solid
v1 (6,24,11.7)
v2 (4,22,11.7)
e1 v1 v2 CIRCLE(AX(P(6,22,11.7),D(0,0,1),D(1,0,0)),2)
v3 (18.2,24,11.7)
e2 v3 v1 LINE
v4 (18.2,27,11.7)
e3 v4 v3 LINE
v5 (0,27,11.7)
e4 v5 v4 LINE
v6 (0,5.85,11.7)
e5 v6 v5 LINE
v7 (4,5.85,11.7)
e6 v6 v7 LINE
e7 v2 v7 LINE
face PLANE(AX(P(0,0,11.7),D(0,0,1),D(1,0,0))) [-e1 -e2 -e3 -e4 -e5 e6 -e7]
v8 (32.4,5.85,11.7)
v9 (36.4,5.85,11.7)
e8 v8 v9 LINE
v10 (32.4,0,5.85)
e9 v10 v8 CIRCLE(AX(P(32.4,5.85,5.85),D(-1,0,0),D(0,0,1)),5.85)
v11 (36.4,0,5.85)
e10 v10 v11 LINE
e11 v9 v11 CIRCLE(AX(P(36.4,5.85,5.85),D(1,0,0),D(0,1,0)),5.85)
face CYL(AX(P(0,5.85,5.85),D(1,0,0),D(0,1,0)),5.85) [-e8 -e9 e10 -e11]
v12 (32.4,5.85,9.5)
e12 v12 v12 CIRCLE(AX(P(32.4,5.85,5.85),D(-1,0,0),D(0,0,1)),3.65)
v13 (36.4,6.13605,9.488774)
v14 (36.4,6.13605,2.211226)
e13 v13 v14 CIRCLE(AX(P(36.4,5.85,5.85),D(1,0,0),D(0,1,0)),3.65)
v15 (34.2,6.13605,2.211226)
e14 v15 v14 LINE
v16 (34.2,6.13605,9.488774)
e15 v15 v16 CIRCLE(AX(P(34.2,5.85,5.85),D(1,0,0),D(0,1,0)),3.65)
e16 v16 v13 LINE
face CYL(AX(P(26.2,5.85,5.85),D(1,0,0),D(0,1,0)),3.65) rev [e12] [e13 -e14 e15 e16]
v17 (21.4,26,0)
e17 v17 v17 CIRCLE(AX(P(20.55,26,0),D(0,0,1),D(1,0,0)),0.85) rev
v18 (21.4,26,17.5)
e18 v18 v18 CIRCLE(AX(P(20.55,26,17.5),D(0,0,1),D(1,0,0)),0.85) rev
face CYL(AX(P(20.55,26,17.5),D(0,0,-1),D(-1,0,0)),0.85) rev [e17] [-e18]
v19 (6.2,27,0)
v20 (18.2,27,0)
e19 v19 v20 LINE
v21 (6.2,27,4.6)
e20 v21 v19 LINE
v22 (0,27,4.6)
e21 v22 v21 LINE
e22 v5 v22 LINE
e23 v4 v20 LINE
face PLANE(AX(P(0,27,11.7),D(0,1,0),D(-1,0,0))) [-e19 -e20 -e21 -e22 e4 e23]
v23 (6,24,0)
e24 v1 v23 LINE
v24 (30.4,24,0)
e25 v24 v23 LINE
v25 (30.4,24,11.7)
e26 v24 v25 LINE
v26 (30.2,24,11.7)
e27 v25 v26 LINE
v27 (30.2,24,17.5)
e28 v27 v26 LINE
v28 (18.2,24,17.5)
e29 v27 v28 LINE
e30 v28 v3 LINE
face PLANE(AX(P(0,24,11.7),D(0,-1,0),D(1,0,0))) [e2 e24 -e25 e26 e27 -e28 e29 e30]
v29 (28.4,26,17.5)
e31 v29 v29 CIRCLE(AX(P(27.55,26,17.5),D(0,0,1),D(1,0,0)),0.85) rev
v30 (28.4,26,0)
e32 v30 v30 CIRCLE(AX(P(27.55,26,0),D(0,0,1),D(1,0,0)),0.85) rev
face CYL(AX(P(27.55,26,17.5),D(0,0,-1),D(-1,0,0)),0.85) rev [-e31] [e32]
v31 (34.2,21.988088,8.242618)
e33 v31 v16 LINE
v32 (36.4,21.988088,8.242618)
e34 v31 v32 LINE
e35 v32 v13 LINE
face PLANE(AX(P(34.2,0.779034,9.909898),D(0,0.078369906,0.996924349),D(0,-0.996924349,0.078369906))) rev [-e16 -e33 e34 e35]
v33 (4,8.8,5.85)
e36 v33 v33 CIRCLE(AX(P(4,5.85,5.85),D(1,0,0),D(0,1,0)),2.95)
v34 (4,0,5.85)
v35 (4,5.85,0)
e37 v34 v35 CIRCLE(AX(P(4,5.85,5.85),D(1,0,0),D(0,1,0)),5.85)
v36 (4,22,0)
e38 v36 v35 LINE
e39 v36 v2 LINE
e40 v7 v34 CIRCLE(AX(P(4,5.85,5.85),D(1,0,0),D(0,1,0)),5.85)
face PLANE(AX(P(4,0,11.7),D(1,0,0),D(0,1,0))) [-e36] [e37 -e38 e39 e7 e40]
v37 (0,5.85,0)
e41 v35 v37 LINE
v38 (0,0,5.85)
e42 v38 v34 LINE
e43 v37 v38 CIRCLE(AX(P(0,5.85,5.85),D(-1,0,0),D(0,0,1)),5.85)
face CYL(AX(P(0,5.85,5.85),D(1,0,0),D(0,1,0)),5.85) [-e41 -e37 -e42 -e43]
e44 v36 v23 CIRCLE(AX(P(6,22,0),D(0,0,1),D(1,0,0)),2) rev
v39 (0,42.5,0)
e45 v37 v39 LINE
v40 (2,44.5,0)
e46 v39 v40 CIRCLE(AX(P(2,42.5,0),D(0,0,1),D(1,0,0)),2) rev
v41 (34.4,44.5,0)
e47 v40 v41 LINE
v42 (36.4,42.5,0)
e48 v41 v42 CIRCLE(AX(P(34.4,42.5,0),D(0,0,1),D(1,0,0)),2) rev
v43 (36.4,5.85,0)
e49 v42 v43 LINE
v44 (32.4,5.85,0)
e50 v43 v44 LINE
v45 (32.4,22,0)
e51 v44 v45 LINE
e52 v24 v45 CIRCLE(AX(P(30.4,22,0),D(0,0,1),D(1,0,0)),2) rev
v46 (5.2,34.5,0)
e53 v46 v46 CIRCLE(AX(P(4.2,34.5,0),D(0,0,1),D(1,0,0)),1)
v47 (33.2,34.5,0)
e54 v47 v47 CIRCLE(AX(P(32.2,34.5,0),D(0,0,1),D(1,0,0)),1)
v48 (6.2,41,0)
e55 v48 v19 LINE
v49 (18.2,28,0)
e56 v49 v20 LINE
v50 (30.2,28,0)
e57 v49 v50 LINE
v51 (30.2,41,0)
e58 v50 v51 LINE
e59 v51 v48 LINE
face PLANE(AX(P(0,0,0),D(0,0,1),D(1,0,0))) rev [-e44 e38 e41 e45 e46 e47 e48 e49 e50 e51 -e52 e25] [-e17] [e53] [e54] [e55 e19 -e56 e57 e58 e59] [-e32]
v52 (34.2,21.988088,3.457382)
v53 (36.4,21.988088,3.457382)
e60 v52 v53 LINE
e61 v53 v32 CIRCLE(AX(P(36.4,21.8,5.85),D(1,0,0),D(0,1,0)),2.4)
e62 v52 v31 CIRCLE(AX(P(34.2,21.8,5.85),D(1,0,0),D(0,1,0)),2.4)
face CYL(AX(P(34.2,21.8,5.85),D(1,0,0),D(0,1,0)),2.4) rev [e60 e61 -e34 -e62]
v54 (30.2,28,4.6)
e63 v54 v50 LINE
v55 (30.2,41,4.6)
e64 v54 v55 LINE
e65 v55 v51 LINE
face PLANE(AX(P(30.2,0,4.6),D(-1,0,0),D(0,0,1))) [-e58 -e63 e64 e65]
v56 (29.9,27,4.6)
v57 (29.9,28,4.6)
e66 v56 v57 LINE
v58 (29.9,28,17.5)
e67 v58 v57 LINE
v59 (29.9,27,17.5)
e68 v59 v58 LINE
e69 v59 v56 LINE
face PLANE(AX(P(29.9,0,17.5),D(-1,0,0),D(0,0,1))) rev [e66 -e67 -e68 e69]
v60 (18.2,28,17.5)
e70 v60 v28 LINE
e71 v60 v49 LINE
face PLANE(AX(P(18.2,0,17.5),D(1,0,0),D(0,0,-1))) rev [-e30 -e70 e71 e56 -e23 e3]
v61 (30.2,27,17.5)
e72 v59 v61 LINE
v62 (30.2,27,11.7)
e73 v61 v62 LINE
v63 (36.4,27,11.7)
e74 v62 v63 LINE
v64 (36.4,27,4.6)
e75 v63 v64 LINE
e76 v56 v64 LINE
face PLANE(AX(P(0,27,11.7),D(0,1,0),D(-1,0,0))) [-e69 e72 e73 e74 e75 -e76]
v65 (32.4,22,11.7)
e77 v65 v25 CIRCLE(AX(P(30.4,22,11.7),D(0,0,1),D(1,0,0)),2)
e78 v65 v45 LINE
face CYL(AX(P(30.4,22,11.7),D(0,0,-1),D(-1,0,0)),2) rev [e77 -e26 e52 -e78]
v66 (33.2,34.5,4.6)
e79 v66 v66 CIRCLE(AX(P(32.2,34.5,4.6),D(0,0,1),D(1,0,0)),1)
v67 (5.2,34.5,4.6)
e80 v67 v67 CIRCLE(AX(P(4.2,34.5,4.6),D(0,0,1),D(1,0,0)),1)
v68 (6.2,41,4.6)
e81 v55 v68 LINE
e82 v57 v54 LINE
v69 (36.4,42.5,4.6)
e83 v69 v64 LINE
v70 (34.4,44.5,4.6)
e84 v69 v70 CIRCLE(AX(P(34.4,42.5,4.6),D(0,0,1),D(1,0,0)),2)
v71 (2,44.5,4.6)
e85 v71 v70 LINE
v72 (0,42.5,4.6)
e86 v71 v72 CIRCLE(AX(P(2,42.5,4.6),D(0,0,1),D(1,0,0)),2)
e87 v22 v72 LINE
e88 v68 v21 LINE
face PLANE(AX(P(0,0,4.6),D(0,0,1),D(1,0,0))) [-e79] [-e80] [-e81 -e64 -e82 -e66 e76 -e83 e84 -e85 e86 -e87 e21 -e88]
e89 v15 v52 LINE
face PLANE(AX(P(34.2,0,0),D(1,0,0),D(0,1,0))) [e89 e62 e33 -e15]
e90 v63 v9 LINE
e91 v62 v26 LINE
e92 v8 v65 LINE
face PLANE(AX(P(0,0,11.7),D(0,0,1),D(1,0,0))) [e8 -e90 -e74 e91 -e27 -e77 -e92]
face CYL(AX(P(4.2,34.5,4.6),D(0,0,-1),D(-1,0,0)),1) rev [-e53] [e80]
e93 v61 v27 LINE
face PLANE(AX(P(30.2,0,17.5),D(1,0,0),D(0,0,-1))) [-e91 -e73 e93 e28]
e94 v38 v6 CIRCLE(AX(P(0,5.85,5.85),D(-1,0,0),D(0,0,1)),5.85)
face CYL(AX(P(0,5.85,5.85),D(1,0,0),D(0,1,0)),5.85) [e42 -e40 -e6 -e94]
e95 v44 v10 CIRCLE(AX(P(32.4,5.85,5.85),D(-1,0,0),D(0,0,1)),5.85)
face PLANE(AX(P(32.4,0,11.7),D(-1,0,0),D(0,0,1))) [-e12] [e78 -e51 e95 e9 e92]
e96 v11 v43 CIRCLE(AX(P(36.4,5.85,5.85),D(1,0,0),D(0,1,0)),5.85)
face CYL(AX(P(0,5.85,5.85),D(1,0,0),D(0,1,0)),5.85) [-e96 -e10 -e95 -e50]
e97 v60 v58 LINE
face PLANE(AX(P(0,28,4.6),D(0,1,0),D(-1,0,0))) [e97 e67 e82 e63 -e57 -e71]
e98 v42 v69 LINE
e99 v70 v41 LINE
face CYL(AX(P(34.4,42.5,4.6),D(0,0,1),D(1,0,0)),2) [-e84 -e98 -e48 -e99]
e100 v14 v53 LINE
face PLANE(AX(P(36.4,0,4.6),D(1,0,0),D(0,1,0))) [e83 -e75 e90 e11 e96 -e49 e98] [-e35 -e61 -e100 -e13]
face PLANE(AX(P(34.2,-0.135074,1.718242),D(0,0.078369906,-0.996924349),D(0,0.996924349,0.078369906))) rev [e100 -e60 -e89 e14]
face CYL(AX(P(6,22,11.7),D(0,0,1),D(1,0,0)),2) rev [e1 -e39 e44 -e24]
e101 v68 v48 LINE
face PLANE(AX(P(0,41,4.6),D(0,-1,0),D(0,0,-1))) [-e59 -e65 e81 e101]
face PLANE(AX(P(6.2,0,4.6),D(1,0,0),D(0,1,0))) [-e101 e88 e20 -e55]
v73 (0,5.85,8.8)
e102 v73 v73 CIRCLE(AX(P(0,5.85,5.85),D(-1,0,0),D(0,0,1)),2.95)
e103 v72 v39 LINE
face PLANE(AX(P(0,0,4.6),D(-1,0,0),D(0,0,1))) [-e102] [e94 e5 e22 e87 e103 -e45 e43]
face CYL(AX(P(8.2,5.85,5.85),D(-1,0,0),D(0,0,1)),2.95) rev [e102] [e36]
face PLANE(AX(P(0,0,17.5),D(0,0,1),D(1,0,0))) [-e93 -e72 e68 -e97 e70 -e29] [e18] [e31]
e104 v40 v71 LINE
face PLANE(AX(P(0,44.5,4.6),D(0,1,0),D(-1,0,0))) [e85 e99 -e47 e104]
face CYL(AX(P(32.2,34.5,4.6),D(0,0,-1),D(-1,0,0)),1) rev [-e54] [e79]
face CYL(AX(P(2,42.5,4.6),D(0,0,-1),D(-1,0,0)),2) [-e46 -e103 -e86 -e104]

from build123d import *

# Parameters (mm, degrees)
SKETCH_1_R          = 1
EXTRUDE_1_DEPTH     = 4.6
EXTRUDE_2_DEPTH     = 11.7
SKETCH_1_4_W        = 12
SKETCH_1_4_H        = 3
EXTRUDE_3_DEPTH     = 11.7
SKETCH_2_R          = 3.65
CUT_EXTRUDE_1_DEPTH = 24.5
CUT_EXTRUDE_2_DEPTH = 2.2
FILLET_2_R          = 5.85
FILLET_3_R          = 5.85
FILLET_4_R          = 5.85
FILLET_1_R          = 5.85
FILLET_5_R          = 2
FILLET_6_R          = 2
FILLET_8_R          = 2
SKETCH_3_R          = 2.95
CUT_EXTRUDE_3_DEPTH = 10
SKETCH_1_6_R        = 0.85
EXTRUDE_5_DEPTH     = 17.5
FILLET_9_R          = 2
CUT_EXTRUDE_START   = -2.2
CUT_EXTRUDE_4_DEPTH = 2.2
CUT_EXTRUDE_START_2 = -10.2
SKETCH_4_3_R        = 3.65
SKETCH_4_3_R_2      = 2.95
CUT_EXTRUDE_5_DEPTH = 10.2
EXTRUDE_6_DEPTH     = 2.2
SKETCH_2_5_R        = 3.65
EXTRUDE_7_DEPTH     = 4
SKETCH_5_R          = 2.95
CUT_EXTRUDE_6_DEPTH = 8.2


with BuildPart() as part:
    # 草图1 → 凸台-拉伸1 (new body)
    with BuildSketch(Plane.XY):
        Polygon((0, 44.5), (0, 27), (6.2, 27), (6.2, 28), (6.2, 41), (30.2, 41), (30.2, 28), (29.9, 28), (29.9, 27), (30.2, 27), (35, 27), (36.4, 27), (36.4, 44.5), align=None)
        with Locations((4.2, 34.5)):
            Circle(SKETCH_1_R, mode=Mode.SUBTRACT)
        with Locations((32.2, 34.5)):
            Circle(SKETCH_1_R, mode=Mode.SUBTRACT)
    extrude(amount=EXTRUDE_1_DEPTH)

    # 草图1<3> → 凸台-拉伸2 (add)
    with BuildSketch(Plane.XY):
        Polygon((0, 27), (0, 0), (4, 0), (4, 24), (6.2, 24), (6.2, 27), align=None)
        Polygon((36.4, 0), (36.4, 27), (30.2, 27), (30.2, 24), (32.4, 24), (32.4, 0), align=None)
    extrude(amount=EXTRUDE_2_DEPTH)

    # 草图1<4> → 凸台-拉伸3 (add)
    with BuildSketch(Plane.XY):
        with Locations((12.2, 25.5)):
            Rectangle(SKETCH_1_4_W, SKETCH_1_4_H)
    extrude(amount=EXTRUDE_3_DEPTH)

    # 草图2 → 切除-拉伸1 (cut)
    with BuildSketch(Plane.ZY):
        with Locations((5.85, 5.85)):
            Circle(SKETCH_2_R)
    extrude(amount=-CUT_EXTRUDE_1_DEPTH, mode=Mode.SUBTRACT)

    # 草图2<3> → 切除-拉伸2 (cut)
    with BuildSketch(Plane.ZY):
        with BuildLine():
            Line((9.488773874, 6.136050157), (8.242618438, 21.988087774))
            ThreePointArc((8.242618438, 21.988087774), (5.85, 24.2), (3.457381562, 21.988087774))
            Line((3.457381562, 21.988087774), (2.211226126, 6.136050157))
            ThreePointArc((2.211226126, 6.136050157), (5.85, 9.5), (9.488773874, 6.136050157))
        make_face()
    extrude(amount=-CUT_EXTRUDE_2_DEPTH, mode=Mode.SUBTRACT)

    # 圆角2
    fillet_2_edges = [part.edges().sort_by_distance(p)[0] for p in [
        (2, 0, 0),
    ]]
    fillet(fillet_2_edges, radius=FILLET_2_R)

    # 圆角3
    fillet_3_edges = [part.edges().sort_by_distance(p)[0] for p in [
        (34.4, 0, 0),
    ]]
    fillet(fillet_3_edges, radius=FILLET_3_R)

    # 圆角4
    fillet_4_edges = [part.edges().sort_by_distance(p)[0] for p in [
        (34.4, 0, 11.7),
    ]]
    fillet(fillet_4_edges, radius=FILLET_4_R - 0.0001)  # a hair under: the kernel refuses the full size

    # 圆角1
    fillet_1_edges = [part.edges().sort_by_distance(p)[0] for p in [
        (2, 0, 11.7),
    ]]
    fillet(fillet_1_edges, radius=FILLET_1_R - 0.0001)  # a hair under: the kernel refuses the full size

    # 圆角5
    fillet_5_edges = [part.edges().sort_by_distance(p)[0] for p in [
        (0, 44.5, 2.3),
    ]]
    fillet(fillet_5_edges, radius=FILLET_5_R)

    # 圆角6
    fillet_6_edges = [part.edges().sort_by_distance(p)[0] for p in [
        (36.4, 44.5, 2.3),
    ]]
    fillet(fillet_6_edges, radius=FILLET_6_R)

    # 圆角8
    fillet_8_edges = [part.edges().sort_by_distance(p)[0] for p in [
        (4, 24, 5.85),
    ]]
    fillet(fillet_8_edges, radius=FILLET_8_R)

    # 草图3 → 切除-拉伸3 (cut)
    with BuildSketch(Plane(origin=(36.4, 0, 0), x_dir=(0, 0, -1), z_dir=(1, 0, 0))):
        with Locations(Location((-5.85, 5.85, 0), (0, 0, 90))):
            Circle(SKETCH_3_R)
    extrude(amount=-CUT_EXTRUDE_3_DEPTH, mode=Mode.SUBTRACT)

    # 草图1<6> → 凸台-拉伸5 (add)
    with BuildSketch(Plane.XY):
        Polygon((18.2, 28), (18.2, 27), (18.2, 24), (30.2, 24), (30.2, 27), (29.9, 27), (29.9, 28), align=None)
        with Locations((20.55, 26)):
            Circle(SKETCH_1_6_R, mode=Mode.SUBTRACT)
        with Locations((27.55, 26)):
            Circle(SKETCH_1_6_R, mode=Mode.SUBTRACT)
    extrude(amount=EXTRUDE_5_DEPTH)

    # 圆角9
    fillet_9_edges = [part.edges().sort_by_distance(p)[0] for p in [
        (32.4, 24, 5.85),
    ]]
    fillet(fillet_9_edges, radius=FILLET_9_R)

    # 草图4 → 切除-拉伸4 (cut)
    with BuildSketch(Plane(origin=(36.4, 0, 0), x_dir=(0, 0, -1), z_dir=(1, 0, 0)).offset(CUT_EXTRUDE_START)):
        with BuildLine():
            ThreePointArc((-3.457381562, 21.988087774), (-5.85, 24.2), (-8.242618438, 21.988087774))
            Line((-8.242618438, 21.988087774), (-9.488773874, 6.136050157))
            ThreePointArc((-9.488773874, 6.136050157), (-5.85, 9.5), (-2.211226126, 6.136050157))
            Line((-2.211226126, 6.136050157), (-3.457381562, 21.988087774))
        make_face()
    extrude(amount=CUT_EXTRUDE_4_DEPTH, mode=Mode.SUBTRACT)

    # 草图4<3> → 切除-拉伸5 (cut)
    with BuildSketch(Plane(origin=(36.4, 0, 0), x_dir=(0, 0, -1), z_dir=(1, 0, 0)).offset(CUT_EXTRUDE_START_2)):
        with Locations(Location((-5.85, 5.85, 0), (0, 0, 175.505125981))):
            Circle(SKETCH_4_3_R)
        with Locations((-5.85, 5.85)):
            Circle(SKETCH_4_3_R_2, mode=Mode.SUBTRACT)
    extrude(amount=CUT_EXTRUDE_5_DEPTH, mode=Mode.SUBTRACT)

    # 草图2<4> → 凸台-拉伸6 (add)
    with BuildSketch(Plane.ZY):
        with BuildLine():
            Line((9.488773874, 6.136050157), (8.242618438, 21.988087774))
            ThreePointArc((8.242618438, 21.988087774), (5.85, 24.2), (3.457381562, 21.988087774))
            Line((3.457381562, 21.988087774), (2.211226126, 6.136050157))
            ThreePointArc((2.211226126, 6.136050157), (5.85, 9.5), (9.488773874, 6.136050157))
        make_face()
    extrude(amount=-EXTRUDE_6_DEPTH)

    # 草图2<5> → 凸台-拉伸7 (add)
    with BuildSketch(Plane.ZY):
        with Locations(Location((5.85, 5.85, 0), (0, 0, 4.494874019))):
            Circle(SKETCH_2_5_R)
    extrude(amount=-EXTRUDE_7_DEPTH)

    # 草图5 → 切除-拉伸6 (cut)
    with BuildSketch(Plane.ZY):
        with Locations((5.85, 5.85)):
            Circle(SKETCH_5_R)
    extrude(amount=-CUT_EXTRUDE_6_DEPTH, mode=Mode.SUBTRACT)


solid = part.part
